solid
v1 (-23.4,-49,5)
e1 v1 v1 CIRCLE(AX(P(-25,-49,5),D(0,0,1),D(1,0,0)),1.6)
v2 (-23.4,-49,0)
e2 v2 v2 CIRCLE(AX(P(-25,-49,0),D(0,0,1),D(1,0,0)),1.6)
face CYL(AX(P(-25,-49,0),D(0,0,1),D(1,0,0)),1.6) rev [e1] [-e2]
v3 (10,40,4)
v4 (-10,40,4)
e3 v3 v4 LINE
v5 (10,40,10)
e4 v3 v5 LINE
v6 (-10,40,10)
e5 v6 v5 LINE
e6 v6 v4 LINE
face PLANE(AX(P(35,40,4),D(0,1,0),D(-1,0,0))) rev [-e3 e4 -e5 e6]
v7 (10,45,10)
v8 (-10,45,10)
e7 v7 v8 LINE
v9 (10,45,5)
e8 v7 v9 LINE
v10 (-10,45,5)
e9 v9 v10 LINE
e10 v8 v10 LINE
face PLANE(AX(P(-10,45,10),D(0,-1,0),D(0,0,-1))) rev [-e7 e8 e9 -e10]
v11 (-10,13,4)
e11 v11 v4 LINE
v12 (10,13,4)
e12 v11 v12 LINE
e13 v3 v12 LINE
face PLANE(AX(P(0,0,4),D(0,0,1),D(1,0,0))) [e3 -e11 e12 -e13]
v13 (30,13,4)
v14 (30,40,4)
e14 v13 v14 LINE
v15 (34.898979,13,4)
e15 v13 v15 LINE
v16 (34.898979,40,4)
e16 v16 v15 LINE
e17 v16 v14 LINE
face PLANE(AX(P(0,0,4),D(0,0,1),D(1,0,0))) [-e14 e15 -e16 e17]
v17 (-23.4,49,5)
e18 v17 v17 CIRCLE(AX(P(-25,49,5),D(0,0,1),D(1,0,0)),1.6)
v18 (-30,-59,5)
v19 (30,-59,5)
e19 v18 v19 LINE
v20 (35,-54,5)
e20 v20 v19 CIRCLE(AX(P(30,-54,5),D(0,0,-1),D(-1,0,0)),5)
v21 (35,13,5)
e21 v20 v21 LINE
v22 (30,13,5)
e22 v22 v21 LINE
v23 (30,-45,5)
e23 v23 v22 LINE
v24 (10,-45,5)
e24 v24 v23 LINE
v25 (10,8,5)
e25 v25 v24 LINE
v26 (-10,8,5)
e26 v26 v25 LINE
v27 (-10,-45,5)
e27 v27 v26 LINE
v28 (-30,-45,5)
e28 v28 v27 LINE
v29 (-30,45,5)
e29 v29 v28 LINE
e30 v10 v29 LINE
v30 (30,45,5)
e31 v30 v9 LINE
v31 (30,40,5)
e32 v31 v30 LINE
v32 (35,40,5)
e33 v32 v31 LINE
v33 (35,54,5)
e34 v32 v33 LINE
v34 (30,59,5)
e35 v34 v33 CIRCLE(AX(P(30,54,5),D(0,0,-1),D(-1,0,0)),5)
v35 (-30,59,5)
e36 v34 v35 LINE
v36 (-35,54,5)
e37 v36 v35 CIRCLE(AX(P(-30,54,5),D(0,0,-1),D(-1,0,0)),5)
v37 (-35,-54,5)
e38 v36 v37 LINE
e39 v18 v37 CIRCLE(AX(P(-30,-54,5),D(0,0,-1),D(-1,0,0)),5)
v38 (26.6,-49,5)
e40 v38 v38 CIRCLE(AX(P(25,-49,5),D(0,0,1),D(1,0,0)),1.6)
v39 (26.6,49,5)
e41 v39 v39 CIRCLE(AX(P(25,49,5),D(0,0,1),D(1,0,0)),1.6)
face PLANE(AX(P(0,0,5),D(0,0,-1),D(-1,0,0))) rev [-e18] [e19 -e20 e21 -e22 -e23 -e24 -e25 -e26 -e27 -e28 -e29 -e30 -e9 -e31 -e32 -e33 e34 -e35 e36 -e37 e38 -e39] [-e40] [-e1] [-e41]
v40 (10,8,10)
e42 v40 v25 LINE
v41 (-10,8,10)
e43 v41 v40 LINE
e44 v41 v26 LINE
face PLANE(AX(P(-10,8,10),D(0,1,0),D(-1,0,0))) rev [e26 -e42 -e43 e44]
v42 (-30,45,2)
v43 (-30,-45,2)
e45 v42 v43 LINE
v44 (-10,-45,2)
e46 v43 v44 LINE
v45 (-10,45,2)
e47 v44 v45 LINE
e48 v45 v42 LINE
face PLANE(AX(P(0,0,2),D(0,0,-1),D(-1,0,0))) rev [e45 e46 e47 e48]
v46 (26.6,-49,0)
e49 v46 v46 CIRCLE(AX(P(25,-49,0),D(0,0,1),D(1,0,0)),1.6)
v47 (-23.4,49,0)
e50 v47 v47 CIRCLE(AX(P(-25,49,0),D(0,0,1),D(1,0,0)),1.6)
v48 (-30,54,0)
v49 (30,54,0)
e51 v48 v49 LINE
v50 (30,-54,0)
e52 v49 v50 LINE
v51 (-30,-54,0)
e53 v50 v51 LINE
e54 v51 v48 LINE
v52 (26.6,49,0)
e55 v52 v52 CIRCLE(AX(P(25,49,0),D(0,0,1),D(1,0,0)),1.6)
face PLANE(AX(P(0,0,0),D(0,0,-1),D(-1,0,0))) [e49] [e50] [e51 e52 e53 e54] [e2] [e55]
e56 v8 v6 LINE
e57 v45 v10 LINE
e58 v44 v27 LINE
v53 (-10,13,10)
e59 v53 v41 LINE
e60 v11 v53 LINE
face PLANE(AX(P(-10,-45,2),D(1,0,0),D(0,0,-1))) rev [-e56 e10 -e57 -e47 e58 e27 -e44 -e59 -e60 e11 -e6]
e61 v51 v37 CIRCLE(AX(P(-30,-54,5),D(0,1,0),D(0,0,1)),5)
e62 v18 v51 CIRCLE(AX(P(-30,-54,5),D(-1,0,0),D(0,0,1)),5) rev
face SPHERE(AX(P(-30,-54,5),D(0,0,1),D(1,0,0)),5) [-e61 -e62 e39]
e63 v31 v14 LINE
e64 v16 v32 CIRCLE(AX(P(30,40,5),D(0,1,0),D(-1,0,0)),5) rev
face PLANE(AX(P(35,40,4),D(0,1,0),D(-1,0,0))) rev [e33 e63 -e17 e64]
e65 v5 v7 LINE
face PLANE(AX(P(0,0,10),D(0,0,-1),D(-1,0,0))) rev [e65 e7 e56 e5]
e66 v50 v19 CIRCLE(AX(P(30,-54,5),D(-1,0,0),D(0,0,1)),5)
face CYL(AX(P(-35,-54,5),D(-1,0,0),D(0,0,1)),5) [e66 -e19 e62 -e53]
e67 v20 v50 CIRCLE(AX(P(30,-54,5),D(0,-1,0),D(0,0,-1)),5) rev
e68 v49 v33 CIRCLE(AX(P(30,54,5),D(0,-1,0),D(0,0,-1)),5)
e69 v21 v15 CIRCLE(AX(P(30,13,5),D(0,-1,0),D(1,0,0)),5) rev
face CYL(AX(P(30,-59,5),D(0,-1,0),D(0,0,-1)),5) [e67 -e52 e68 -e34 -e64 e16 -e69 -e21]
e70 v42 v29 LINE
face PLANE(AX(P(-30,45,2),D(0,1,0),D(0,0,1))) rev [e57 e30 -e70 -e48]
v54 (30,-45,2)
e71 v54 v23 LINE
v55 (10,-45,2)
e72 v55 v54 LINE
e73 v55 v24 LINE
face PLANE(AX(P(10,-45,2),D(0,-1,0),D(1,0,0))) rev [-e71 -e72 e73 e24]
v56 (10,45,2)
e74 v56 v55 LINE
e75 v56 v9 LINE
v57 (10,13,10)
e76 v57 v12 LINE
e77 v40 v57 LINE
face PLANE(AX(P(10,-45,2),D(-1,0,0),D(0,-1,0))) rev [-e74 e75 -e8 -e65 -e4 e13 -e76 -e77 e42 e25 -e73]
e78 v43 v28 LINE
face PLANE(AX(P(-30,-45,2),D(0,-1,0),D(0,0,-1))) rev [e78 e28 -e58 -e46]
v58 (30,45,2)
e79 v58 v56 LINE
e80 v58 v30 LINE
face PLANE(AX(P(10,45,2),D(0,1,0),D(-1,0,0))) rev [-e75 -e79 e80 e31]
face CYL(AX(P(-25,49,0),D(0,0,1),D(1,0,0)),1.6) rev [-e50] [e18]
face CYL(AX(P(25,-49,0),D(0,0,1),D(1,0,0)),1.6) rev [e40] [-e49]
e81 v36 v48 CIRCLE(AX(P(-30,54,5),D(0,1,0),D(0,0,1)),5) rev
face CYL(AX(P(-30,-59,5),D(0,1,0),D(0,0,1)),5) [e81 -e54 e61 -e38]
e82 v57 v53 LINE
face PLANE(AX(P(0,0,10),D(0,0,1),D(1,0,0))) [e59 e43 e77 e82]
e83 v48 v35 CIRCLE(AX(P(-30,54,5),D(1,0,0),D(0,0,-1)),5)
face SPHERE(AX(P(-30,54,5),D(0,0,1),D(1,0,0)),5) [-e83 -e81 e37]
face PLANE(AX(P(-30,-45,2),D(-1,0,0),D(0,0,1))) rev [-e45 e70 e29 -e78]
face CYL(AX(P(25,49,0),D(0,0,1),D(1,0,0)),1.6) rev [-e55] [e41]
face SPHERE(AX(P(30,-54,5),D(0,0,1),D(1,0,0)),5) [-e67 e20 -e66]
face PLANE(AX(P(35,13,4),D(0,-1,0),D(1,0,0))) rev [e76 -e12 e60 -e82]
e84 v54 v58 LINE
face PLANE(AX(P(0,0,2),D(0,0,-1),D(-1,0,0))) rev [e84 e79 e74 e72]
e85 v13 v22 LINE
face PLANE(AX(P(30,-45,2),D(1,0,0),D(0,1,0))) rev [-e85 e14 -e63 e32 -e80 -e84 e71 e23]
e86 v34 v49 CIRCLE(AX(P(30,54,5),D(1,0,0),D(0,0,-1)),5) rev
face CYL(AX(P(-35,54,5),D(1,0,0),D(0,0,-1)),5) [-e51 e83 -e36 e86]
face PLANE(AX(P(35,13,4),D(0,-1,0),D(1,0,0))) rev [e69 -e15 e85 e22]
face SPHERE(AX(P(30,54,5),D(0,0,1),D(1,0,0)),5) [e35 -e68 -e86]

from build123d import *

# Parameters (mm, degrees)
SKETCH_1_W          = 70
SKETCH_1_H          = 118
EXTRUDE_1_DEPTH     = 40
SKETCH_2_W          = 64
SKETCH_2_H          = 112
CUT_EXTRUDE_1_DEPTH = 35
SKETCH_3_R          = 1.6
CUT_EXTRUDE_2_DEPTH = 78.012985918
FILLET_1_R          = 5
FILLET_2_R          = 5
SKETCH_4_W          = 80
SKETCH_4_H          = 120
CUT_EXTRUDE_3_DEPTH = 35
SKETCH_5_W          = 60
SKETCH_5_H          = 27
CUT_EXTRUDE_4_DEPTH = 1
SKETCH_6_W          = 20
SKETCH_6_H          = 90
CUT_EXTRUDE_5_DEPTH = 3
SKETCH_7_W          = 20
SKETCH_7_H          = 90
CUT_EXTRUDE_6_DEPTH = 3
SKETCH_8_W          = 20
SKETCH_8_H          = 5
EXTRUDE_2_DEPTH     = 5


with BuildPart() as part:
    # ｽｹｯﾁ1 → ﾎﾞｽ - 押し出し1 (new body)
    with BuildSketch(Plane.XY):
        Rectangle(SKETCH_1_W, SKETCH_1_H)
    extrude(amount=EXTRUDE_1_DEPTH)

    # ｽｹｯﾁ2 → ｶｯﾄ - 押し出し1 (cut)
    with BuildSketch(Plane.XY.offset(40)):
        Rectangle(SKETCH_2_W, SKETCH_2_H)
    extrude(amount=-CUT_EXTRUDE_1_DEPTH, mode=Mode.SUBTRACT)

    # ｽｹｯﾁ3 → ｶｯﾄ - 押し出し2 (cut, through all)
    with BuildSketch(Plane.XY.offset(5)):
        with Locations((-25, 49)):
            Circle(SKETCH_3_R)
        with Locations((25, 49)):
            Circle(SKETCH_3_R)
        with Locations((-25, -49)):
            Circle(SKETCH_3_R)
        with Locations((25, -49)):
            Circle(SKETCH_3_R)
    extrude(amount=-CUT_EXTRUDE_2_DEPTH, mode=Mode.SUBTRACT)

    # ﾌｨﾚｯﾄ1
    fillet_1_edges = [part.edges().sort_by_distance(p)[0] for p in [
        (0, -59, 0),
        (-35, 0, 0),
        (0, 59, 0),
        (35, 0, 0),
    ]]
    fillet(fillet_1_edges, radius=FILLET_1_R)

    # ﾌｨﾚｯﾄ2
    # the kernel refuses this fillet: 5 mm, written as the material it takes off along each edge
    with BuildSketch(Plane(origin=(-30, 54, 5), x_dir=(0, 1, 0), z_dir=(-1, 0, 0))) as fillet_2_piece_1_section:
        Polygon((0, 0), (FILLET_2_R, 0), (FILLET_2_R, FILLET_2_R), (0, FILLET_2_R), align=None)
    fillet_2_piece_1 = extrude(amount=FILLET_2_R, mode=Mode.PRIVATE)
    fillet_2_piece_1 = fillet_2_piece_1 - Plane(origin=(-30, 54, 5), x_dir=(0, -0.7071067811865475, 0.7071067811865475), z_dir=(-1, 0, 0)) * Sphere(FILLET_2_R, mode=Mode.PRIVATE)
    add(fillet_2_piece_1, mode=Mode.SUBTRACT)
    with BuildSketch(Plane(origin=(30, 54, 5), x_dir=(0, 1, 0), z_dir=(1, 0, 0))) as fillet_2_piece_2_section:
        Polygon((0, 0), (FILLET_2_R, 0), (FILLET_2_R, -FILLET_2_R), (0, -FILLET_2_R), align=None)
    fillet_2_piece_2 = extrude(amount=FILLET_2_R, mode=Mode.PRIVATE)
    fillet_2_piece_2 = fillet_2_piece_2 - Plane(origin=(30, 54, 5), x_dir=(0, -0.7071067811865475, 0.7071067811865475), z_dir=(1, 0, 0)) * Sphere(FILLET_2_R, mode=Mode.PRIVATE)
    add(fillet_2_piece_2, mode=Mode.SUBTRACT)
    with BuildSketch(Plane(origin=(-30, -54, 5), x_dir=(-1, 0, 0), z_dir=(0, -1, 0))) as fillet_2_piece_3_section:
        Polygon((0, 0), (FILLET_2_R, 0), (FILLET_2_R, FILLET_2_R), (0, FILLET_2_R), align=None)
    fillet_2_piece_3 = extrude(amount=FILLET_2_R, mode=Mode.PRIVATE)
    fillet_2_piece_3 = fillet_2_piece_3 - Plane(origin=(-30, -54, 5), x_dir=(0.7071067811865475, 0, 0.7071067811865475), z_dir=(0, -1, 0)) * Sphere(FILLET_2_R, mode=Mode.PRIVATE)
    add(fillet_2_piece_3, mode=Mode.SUBTRACT)
    with BuildSketch(Plane(origin=(30, -54, 5), x_dir=(1, 0, 0), z_dir=(0, -1, 0))) as fillet_2_piece_4_section:
        Polygon((0, 0), (FILLET_2_R, 0), (FILLET_2_R, -FILLET_2_R), (0, -FILLET_2_R), align=None)
    fillet_2_piece_4 = extrude(amount=FILLET_2_R, mode=Mode.PRIVATE)
    fillet_2_piece_4 = fillet_2_piece_4 - Plane(origin=(30, -54, 5), x_dir=(-0.7071067811865475, 0, 0.7071067811865475), z_dir=(0, -1, 0)) * Sphere(FILLET_2_R, mode=Mode.PRIVATE)
    add(fillet_2_piece_4, mode=Mode.SUBTRACT)
    with BuildSketch(Plane(origin=(35, -59, 5), x_dir=(-1, 0, 0), z_dir=(0, 0, 1)), Plane(origin=(35, 59, 5), x_dir=(0, -1, 0), z_dir=(0, 0, 1))) as fillet_2_piece_5:
        with BuildLine():
            CenterArc((FILLET_2_R, -FILLET_2_R), FILLET_2_R, 90, 90)
            Line((0, -FILLET_2_R), (0, 0))
            Line((0, 0), (FILLET_2_R, 0))
        make_face()
    extrude(amount=47.5, mode=Mode.SUBTRACT)
    with BuildSketch(Plane(origin=(-35, -59, 5), x_dir=(1, 0, 0), z_dir=(0, 0, 1)), Plane(origin=(-35, 59, 5), x_dir=(0, -1, 0), z_dir=(0, 0, 1))) as fillet_2_piece_6:
        with BuildLine():
            CenterArc((FILLET_2_R, FILLET_2_R), FILLET_2_R, 180, 90)
            Line((0, FILLET_2_R), (0, 0))
            Line((0, 0), (FILLET_2_R, 0))
        make_face()
    extrude(amount=47.5, mode=Mode.SUBTRACT)

    # ｽｹｯﾁ4 → ｶｯﾄ - 押し出し3 (cut)
    with BuildSketch(Plane.XY.offset(40)):
        Rectangle(SKETCH_4_W, SKETCH_4_H)
    extrude(amount=-CUT_EXTRUDE_3_DEPTH, mode=Mode.SUBTRACT)

    # ｽｹｯﾁ5 → ｶｯﾄ - 押し出し4 (cut)
    with BuildSketch(Plane.XY.offset(5)):
        with Locations((5, 26.5)):
            Rectangle(SKETCH_5_W, SKETCH_5_H)
    extrude(amount=-CUT_EXTRUDE_4_DEPTH, mode=Mode.SUBTRACT)

    # ｽｹｯﾁ6 → ｶｯﾄ - 押し出し5 (cut)
    with BuildSketch(Plane.XY.offset(5)):
        with Locations((-20, 0)):
            Rectangle(SKETCH_6_W, SKETCH_6_H)
    extrude(amount=-CUT_EXTRUDE_5_DEPTH, mode=Mode.SUBTRACT)

    # ｽｹｯﾁ7 → ｶｯﾄ - 押し出し6 (cut)
    with BuildSketch(Plane.XY.offset(5)):
        with Locations((20, 0)):
            Rectangle(SKETCH_7_W, SKETCH_7_H)
    extrude(amount=-CUT_EXTRUDE_6_DEPTH, mode=Mode.SUBTRACT)

    # ｽｹｯﾁ8 → ﾎﾞｽ - 押し出し2 (add)
    with BuildSketch(Plane.XY.offset(5)):
        with Locations((0, 10.5)):
            Rectangle(SKETCH_8_W, SKETCH_8_H)
        with Locations((0, 42.5)):
            Rectangle(SKETCH_8_W, SKETCH_8_H)
    extrude(amount=EXTRUDE_2_DEPTH)


solid = part.part
